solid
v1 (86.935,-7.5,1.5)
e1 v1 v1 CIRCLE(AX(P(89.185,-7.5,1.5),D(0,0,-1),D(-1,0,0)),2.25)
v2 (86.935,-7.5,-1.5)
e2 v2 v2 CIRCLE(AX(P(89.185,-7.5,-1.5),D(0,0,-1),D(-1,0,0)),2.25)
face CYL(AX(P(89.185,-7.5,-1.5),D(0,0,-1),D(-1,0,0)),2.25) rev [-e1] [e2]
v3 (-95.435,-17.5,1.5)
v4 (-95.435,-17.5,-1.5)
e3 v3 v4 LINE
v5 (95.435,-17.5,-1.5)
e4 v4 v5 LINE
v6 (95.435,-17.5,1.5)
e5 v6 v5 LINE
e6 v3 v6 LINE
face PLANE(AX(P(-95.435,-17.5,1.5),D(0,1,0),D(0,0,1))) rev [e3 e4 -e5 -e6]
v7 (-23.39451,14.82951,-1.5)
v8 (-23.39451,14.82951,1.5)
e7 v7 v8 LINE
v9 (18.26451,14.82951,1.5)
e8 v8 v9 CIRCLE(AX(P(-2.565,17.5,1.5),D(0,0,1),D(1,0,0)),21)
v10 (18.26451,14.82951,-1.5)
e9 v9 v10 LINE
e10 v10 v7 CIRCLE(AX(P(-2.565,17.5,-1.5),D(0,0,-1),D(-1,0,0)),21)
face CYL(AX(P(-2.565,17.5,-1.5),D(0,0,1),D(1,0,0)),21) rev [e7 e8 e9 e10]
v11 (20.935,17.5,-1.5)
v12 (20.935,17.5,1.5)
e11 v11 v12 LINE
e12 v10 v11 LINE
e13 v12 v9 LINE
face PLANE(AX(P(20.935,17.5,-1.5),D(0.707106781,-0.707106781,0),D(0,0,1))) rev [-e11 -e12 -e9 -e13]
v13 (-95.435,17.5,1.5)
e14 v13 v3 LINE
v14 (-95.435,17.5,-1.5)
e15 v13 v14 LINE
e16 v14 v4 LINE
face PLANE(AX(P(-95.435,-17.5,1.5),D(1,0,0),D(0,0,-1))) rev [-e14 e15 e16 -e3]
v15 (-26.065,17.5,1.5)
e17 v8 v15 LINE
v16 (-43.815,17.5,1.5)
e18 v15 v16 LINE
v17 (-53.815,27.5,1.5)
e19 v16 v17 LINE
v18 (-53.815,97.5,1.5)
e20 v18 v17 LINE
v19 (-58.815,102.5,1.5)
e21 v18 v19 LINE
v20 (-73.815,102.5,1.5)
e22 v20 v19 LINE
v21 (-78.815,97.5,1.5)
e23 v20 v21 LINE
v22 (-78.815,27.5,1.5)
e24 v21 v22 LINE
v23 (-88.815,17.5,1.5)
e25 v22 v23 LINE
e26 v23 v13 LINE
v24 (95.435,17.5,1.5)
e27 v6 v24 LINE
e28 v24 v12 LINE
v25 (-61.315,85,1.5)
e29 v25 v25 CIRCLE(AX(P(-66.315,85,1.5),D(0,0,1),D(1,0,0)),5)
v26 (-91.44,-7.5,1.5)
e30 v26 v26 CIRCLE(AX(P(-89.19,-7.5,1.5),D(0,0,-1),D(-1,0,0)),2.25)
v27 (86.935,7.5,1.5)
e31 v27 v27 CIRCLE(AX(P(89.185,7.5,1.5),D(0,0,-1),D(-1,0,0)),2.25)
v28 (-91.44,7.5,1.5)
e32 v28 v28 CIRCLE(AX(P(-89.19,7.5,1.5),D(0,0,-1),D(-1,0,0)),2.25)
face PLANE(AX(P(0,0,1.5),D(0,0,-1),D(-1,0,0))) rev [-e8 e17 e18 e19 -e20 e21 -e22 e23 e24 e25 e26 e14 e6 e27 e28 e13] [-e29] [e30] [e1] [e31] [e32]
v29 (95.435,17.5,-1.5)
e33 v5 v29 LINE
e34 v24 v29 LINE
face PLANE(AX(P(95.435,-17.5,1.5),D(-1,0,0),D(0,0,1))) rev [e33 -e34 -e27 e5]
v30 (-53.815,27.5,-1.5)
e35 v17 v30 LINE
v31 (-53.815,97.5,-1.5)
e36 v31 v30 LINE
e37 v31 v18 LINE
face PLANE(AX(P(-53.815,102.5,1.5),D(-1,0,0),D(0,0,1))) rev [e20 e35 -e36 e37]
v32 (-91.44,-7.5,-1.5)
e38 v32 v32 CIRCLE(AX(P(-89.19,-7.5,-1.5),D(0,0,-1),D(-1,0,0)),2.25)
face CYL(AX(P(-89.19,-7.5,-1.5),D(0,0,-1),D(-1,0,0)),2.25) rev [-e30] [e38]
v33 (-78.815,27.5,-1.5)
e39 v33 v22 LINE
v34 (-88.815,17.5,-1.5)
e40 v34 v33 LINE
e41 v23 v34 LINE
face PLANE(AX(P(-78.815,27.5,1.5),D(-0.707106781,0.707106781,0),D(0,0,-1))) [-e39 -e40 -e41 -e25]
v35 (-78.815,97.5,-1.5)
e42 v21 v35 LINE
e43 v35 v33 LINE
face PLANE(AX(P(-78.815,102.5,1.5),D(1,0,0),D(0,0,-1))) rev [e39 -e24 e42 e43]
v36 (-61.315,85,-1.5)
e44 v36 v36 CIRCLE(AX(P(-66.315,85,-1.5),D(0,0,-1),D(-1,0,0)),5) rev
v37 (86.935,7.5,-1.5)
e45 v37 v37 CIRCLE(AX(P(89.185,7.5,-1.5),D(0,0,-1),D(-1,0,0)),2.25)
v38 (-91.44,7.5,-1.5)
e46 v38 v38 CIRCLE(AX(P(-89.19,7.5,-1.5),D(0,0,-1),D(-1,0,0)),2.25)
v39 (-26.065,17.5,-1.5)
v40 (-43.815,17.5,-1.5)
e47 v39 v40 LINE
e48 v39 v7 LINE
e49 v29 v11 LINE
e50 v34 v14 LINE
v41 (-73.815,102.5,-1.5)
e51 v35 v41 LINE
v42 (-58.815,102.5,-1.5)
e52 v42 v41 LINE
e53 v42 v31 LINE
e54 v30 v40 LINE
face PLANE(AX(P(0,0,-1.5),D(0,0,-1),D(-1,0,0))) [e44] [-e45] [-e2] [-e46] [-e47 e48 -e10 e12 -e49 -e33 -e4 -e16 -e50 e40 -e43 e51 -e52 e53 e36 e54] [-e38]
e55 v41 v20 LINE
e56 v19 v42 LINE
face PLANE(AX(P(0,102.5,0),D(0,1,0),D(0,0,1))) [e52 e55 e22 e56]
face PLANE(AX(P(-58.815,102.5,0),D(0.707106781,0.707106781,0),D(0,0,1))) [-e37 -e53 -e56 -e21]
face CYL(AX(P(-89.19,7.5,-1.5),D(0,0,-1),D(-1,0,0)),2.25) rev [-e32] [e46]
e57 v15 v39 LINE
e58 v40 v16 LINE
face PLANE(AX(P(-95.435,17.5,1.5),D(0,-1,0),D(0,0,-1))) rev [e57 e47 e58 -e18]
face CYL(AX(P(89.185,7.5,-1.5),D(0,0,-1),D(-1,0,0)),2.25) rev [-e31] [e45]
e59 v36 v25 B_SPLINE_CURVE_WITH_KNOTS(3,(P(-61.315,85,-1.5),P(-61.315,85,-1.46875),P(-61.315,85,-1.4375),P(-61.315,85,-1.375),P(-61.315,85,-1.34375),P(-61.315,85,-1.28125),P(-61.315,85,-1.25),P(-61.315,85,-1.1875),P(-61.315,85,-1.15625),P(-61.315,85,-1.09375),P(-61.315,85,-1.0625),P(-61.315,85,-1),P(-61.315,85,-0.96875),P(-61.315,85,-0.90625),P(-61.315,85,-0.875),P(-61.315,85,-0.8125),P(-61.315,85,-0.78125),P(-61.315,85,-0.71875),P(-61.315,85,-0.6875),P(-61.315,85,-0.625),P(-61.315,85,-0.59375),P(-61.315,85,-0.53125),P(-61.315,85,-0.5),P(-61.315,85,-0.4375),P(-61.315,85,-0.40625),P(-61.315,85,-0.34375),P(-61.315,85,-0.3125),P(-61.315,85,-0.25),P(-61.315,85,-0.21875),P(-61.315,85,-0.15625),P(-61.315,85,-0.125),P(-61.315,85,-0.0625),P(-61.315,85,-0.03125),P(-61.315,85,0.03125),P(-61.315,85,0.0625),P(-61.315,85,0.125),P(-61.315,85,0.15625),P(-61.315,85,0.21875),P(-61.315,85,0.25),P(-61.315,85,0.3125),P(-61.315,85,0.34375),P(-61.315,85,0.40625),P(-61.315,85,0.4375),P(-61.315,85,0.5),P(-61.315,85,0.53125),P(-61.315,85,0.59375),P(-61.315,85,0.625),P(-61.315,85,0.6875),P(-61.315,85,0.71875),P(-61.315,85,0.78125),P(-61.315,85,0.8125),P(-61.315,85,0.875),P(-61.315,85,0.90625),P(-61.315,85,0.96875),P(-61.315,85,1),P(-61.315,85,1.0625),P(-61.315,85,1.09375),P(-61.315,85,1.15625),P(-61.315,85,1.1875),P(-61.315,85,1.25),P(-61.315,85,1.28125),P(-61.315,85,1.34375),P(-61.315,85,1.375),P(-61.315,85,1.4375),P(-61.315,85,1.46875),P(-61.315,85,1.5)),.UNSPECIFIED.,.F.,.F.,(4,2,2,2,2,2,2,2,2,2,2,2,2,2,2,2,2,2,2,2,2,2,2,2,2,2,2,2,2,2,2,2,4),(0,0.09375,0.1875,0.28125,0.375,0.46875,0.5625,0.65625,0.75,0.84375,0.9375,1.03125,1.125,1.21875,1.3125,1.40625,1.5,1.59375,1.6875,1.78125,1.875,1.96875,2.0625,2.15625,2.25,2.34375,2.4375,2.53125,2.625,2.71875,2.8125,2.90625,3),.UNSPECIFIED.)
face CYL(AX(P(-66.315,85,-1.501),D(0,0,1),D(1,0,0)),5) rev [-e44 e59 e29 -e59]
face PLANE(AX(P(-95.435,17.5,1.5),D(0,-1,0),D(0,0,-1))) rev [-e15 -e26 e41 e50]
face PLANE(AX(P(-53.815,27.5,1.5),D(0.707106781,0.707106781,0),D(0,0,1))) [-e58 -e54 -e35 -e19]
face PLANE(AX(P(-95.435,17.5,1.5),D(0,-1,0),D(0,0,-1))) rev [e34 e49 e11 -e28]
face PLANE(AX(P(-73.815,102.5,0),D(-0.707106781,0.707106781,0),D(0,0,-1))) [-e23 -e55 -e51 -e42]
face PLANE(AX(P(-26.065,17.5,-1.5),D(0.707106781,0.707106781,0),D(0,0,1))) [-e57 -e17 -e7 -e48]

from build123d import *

# Parameters (mm, degrees)
SKETCH1_W            = 190.87
SKETCH1_H            = 35
BOSS_EXTRUDE1_DEPTH  = 1.5
SKETCH2_R            = 21
CUT_EXTRUDE1_DEPTH   = 98.072597704
SKETCH3_W            = 25
SKETCH3_H            = 3
BOSS_EXTRUDE2_DEPTH  = 85
CHAMFER1_SIZE        = 5
CUT_EXTRUDE2_REACH   = 142.082
SKETCH4_R            = 5
CHAMFER2_SIZE        = 10
M4_CLEARANCE_HOLE1_D = 4.5
CHAMFER3_SIZE        = 2.5


with BuildPart() as part:
    # Sketch1 → Boss-Extrude1 (new, symmetric)
    with BuildSketch(Plane.XY):
        Rectangle(SKETCH1_W, SKETCH1_H)
    extrude(amount=BOSS_EXTRUDE1_DEPTH, both=True)

    # Sketch2 → Cut-Extrude1 (cut, through all)
    with BuildSketch(Plane.XY.offset(1.5)):
        with Locations((-2.565, 17.5)):
            Circle(SKETCH2_R)
    extrude(amount=-CUT_EXTRUDE1_DEPTH, mode=Mode.SUBTRACT)

    # Sketch3 → Boss-Extrude2 (add)
    with BuildSketch(Plane(origin=(0, 17.5, 0), x_dir=(1, 0, 0), z_dir=(0, 1, 0))):
        with Locations((-66.315, 0)):
            Rectangle(SKETCH3_W, SKETCH3_H)
    extrude(amount=BOSS_EXTRUDE2_DEPTH)

    # Chamfer1
    chamfer1_edges = [part.edges().sort_by_distance(p)[0] for p in [
        (-53.815, 102.5, 0),
        (-78.815, 102.5, 0),
    ]]
    chamfer(chamfer1_edges, length=CHAMFER1_SIZE)

    # Sketch4 → Cut-Extrude2 (cut, up to next)
    with BuildSketch(Plane.XY.offset(1.5), mode=Mode.PRIVATE) as cut_extrude2_sk1:
        with Locations((-66.315, 85)):
            Circle(SKETCH4_R)
    cut_extrude2_tool1 = extrude(cut_extrude2_sk1.sketch, amount=-CUT_EXTRUDE2_REACH, mode=Mode.PRIVATE) & part.part
    add(cut_extrude2_tool1.solids().sort_by_distance((-66.315, 85, 1.5))[0], mode=Mode.SUBTRACT)

    # Chamfer2
    chamfer2_edges = [part.edges().sort_by_distance(p)[0] for p in [
        (-53.815, 17.5, 0),
        (-78.815, 17.5, 0),
    ]]
    chamfer(chamfer2_edges, length=CHAMFER2_SIZE)

    # M4 Clearance Hole1 (through all)
    with Locations(Plane(origin=(0, 0, -1.5), x_dir=(-1, 0, 0), z_dir=(0, 0, -1))):
        with Locations((-89.185, 7.5), (-89.185, -7.5), (89.19, 7.5), (89.19, -7.5)):
            Hole(M4_CLEARANCE_HOLE1_D / 2)

    # Chamfer3
    # the kernel refuses this chamfer: 2.5 mm, written as the material it takes off along each edge
    with BuildSketch(Plane(origin=(18.435, 17.5, 8.379480144), x_dir=(-0.06371254293281461, -0.9979682920178548, 0), z_dir=(0, 0, -1))) as chamfer3_piece_1:
        with BuildLine():
            Line((2.675926803, 0), (-CHAMFER3_SIZE * 0.0637125429328, -CHAMFER3_SIZE * 0.997968292018))
            Line((-CHAMFER3_SIZE * 0.0637125429328, -CHAMFER3_SIZE * 0.997968292018), (0, 0))
            ThreePointArc((0, 0), (1.375635219, -0.042632078), (2.675926803, 0))
        make_face()
    extrude(amount=16.758960289, mode=Mode.SUBTRACT)
    with BuildSketch(Plane(origin=(-23.565, 17.5, -8.379480144), x_dir=(-1, 0, 0), z_dir=(0, 0, 1))) as chamfer3_piece_2:
        with BuildLine():
            Line((CHAMFER3_SIZE, 0), (-0.170490101, 2.670490101))
            ThreePointArc((-0.170490101, 2.670490101), (-0.045099756, 1.375556528), (0, 0))
            Line((0, 0), (CHAMFER3_SIZE, 0))
        make_face()
    extrude(amount=16.758960289, mode=Mode.SUBTRACT)


solid = part.part
